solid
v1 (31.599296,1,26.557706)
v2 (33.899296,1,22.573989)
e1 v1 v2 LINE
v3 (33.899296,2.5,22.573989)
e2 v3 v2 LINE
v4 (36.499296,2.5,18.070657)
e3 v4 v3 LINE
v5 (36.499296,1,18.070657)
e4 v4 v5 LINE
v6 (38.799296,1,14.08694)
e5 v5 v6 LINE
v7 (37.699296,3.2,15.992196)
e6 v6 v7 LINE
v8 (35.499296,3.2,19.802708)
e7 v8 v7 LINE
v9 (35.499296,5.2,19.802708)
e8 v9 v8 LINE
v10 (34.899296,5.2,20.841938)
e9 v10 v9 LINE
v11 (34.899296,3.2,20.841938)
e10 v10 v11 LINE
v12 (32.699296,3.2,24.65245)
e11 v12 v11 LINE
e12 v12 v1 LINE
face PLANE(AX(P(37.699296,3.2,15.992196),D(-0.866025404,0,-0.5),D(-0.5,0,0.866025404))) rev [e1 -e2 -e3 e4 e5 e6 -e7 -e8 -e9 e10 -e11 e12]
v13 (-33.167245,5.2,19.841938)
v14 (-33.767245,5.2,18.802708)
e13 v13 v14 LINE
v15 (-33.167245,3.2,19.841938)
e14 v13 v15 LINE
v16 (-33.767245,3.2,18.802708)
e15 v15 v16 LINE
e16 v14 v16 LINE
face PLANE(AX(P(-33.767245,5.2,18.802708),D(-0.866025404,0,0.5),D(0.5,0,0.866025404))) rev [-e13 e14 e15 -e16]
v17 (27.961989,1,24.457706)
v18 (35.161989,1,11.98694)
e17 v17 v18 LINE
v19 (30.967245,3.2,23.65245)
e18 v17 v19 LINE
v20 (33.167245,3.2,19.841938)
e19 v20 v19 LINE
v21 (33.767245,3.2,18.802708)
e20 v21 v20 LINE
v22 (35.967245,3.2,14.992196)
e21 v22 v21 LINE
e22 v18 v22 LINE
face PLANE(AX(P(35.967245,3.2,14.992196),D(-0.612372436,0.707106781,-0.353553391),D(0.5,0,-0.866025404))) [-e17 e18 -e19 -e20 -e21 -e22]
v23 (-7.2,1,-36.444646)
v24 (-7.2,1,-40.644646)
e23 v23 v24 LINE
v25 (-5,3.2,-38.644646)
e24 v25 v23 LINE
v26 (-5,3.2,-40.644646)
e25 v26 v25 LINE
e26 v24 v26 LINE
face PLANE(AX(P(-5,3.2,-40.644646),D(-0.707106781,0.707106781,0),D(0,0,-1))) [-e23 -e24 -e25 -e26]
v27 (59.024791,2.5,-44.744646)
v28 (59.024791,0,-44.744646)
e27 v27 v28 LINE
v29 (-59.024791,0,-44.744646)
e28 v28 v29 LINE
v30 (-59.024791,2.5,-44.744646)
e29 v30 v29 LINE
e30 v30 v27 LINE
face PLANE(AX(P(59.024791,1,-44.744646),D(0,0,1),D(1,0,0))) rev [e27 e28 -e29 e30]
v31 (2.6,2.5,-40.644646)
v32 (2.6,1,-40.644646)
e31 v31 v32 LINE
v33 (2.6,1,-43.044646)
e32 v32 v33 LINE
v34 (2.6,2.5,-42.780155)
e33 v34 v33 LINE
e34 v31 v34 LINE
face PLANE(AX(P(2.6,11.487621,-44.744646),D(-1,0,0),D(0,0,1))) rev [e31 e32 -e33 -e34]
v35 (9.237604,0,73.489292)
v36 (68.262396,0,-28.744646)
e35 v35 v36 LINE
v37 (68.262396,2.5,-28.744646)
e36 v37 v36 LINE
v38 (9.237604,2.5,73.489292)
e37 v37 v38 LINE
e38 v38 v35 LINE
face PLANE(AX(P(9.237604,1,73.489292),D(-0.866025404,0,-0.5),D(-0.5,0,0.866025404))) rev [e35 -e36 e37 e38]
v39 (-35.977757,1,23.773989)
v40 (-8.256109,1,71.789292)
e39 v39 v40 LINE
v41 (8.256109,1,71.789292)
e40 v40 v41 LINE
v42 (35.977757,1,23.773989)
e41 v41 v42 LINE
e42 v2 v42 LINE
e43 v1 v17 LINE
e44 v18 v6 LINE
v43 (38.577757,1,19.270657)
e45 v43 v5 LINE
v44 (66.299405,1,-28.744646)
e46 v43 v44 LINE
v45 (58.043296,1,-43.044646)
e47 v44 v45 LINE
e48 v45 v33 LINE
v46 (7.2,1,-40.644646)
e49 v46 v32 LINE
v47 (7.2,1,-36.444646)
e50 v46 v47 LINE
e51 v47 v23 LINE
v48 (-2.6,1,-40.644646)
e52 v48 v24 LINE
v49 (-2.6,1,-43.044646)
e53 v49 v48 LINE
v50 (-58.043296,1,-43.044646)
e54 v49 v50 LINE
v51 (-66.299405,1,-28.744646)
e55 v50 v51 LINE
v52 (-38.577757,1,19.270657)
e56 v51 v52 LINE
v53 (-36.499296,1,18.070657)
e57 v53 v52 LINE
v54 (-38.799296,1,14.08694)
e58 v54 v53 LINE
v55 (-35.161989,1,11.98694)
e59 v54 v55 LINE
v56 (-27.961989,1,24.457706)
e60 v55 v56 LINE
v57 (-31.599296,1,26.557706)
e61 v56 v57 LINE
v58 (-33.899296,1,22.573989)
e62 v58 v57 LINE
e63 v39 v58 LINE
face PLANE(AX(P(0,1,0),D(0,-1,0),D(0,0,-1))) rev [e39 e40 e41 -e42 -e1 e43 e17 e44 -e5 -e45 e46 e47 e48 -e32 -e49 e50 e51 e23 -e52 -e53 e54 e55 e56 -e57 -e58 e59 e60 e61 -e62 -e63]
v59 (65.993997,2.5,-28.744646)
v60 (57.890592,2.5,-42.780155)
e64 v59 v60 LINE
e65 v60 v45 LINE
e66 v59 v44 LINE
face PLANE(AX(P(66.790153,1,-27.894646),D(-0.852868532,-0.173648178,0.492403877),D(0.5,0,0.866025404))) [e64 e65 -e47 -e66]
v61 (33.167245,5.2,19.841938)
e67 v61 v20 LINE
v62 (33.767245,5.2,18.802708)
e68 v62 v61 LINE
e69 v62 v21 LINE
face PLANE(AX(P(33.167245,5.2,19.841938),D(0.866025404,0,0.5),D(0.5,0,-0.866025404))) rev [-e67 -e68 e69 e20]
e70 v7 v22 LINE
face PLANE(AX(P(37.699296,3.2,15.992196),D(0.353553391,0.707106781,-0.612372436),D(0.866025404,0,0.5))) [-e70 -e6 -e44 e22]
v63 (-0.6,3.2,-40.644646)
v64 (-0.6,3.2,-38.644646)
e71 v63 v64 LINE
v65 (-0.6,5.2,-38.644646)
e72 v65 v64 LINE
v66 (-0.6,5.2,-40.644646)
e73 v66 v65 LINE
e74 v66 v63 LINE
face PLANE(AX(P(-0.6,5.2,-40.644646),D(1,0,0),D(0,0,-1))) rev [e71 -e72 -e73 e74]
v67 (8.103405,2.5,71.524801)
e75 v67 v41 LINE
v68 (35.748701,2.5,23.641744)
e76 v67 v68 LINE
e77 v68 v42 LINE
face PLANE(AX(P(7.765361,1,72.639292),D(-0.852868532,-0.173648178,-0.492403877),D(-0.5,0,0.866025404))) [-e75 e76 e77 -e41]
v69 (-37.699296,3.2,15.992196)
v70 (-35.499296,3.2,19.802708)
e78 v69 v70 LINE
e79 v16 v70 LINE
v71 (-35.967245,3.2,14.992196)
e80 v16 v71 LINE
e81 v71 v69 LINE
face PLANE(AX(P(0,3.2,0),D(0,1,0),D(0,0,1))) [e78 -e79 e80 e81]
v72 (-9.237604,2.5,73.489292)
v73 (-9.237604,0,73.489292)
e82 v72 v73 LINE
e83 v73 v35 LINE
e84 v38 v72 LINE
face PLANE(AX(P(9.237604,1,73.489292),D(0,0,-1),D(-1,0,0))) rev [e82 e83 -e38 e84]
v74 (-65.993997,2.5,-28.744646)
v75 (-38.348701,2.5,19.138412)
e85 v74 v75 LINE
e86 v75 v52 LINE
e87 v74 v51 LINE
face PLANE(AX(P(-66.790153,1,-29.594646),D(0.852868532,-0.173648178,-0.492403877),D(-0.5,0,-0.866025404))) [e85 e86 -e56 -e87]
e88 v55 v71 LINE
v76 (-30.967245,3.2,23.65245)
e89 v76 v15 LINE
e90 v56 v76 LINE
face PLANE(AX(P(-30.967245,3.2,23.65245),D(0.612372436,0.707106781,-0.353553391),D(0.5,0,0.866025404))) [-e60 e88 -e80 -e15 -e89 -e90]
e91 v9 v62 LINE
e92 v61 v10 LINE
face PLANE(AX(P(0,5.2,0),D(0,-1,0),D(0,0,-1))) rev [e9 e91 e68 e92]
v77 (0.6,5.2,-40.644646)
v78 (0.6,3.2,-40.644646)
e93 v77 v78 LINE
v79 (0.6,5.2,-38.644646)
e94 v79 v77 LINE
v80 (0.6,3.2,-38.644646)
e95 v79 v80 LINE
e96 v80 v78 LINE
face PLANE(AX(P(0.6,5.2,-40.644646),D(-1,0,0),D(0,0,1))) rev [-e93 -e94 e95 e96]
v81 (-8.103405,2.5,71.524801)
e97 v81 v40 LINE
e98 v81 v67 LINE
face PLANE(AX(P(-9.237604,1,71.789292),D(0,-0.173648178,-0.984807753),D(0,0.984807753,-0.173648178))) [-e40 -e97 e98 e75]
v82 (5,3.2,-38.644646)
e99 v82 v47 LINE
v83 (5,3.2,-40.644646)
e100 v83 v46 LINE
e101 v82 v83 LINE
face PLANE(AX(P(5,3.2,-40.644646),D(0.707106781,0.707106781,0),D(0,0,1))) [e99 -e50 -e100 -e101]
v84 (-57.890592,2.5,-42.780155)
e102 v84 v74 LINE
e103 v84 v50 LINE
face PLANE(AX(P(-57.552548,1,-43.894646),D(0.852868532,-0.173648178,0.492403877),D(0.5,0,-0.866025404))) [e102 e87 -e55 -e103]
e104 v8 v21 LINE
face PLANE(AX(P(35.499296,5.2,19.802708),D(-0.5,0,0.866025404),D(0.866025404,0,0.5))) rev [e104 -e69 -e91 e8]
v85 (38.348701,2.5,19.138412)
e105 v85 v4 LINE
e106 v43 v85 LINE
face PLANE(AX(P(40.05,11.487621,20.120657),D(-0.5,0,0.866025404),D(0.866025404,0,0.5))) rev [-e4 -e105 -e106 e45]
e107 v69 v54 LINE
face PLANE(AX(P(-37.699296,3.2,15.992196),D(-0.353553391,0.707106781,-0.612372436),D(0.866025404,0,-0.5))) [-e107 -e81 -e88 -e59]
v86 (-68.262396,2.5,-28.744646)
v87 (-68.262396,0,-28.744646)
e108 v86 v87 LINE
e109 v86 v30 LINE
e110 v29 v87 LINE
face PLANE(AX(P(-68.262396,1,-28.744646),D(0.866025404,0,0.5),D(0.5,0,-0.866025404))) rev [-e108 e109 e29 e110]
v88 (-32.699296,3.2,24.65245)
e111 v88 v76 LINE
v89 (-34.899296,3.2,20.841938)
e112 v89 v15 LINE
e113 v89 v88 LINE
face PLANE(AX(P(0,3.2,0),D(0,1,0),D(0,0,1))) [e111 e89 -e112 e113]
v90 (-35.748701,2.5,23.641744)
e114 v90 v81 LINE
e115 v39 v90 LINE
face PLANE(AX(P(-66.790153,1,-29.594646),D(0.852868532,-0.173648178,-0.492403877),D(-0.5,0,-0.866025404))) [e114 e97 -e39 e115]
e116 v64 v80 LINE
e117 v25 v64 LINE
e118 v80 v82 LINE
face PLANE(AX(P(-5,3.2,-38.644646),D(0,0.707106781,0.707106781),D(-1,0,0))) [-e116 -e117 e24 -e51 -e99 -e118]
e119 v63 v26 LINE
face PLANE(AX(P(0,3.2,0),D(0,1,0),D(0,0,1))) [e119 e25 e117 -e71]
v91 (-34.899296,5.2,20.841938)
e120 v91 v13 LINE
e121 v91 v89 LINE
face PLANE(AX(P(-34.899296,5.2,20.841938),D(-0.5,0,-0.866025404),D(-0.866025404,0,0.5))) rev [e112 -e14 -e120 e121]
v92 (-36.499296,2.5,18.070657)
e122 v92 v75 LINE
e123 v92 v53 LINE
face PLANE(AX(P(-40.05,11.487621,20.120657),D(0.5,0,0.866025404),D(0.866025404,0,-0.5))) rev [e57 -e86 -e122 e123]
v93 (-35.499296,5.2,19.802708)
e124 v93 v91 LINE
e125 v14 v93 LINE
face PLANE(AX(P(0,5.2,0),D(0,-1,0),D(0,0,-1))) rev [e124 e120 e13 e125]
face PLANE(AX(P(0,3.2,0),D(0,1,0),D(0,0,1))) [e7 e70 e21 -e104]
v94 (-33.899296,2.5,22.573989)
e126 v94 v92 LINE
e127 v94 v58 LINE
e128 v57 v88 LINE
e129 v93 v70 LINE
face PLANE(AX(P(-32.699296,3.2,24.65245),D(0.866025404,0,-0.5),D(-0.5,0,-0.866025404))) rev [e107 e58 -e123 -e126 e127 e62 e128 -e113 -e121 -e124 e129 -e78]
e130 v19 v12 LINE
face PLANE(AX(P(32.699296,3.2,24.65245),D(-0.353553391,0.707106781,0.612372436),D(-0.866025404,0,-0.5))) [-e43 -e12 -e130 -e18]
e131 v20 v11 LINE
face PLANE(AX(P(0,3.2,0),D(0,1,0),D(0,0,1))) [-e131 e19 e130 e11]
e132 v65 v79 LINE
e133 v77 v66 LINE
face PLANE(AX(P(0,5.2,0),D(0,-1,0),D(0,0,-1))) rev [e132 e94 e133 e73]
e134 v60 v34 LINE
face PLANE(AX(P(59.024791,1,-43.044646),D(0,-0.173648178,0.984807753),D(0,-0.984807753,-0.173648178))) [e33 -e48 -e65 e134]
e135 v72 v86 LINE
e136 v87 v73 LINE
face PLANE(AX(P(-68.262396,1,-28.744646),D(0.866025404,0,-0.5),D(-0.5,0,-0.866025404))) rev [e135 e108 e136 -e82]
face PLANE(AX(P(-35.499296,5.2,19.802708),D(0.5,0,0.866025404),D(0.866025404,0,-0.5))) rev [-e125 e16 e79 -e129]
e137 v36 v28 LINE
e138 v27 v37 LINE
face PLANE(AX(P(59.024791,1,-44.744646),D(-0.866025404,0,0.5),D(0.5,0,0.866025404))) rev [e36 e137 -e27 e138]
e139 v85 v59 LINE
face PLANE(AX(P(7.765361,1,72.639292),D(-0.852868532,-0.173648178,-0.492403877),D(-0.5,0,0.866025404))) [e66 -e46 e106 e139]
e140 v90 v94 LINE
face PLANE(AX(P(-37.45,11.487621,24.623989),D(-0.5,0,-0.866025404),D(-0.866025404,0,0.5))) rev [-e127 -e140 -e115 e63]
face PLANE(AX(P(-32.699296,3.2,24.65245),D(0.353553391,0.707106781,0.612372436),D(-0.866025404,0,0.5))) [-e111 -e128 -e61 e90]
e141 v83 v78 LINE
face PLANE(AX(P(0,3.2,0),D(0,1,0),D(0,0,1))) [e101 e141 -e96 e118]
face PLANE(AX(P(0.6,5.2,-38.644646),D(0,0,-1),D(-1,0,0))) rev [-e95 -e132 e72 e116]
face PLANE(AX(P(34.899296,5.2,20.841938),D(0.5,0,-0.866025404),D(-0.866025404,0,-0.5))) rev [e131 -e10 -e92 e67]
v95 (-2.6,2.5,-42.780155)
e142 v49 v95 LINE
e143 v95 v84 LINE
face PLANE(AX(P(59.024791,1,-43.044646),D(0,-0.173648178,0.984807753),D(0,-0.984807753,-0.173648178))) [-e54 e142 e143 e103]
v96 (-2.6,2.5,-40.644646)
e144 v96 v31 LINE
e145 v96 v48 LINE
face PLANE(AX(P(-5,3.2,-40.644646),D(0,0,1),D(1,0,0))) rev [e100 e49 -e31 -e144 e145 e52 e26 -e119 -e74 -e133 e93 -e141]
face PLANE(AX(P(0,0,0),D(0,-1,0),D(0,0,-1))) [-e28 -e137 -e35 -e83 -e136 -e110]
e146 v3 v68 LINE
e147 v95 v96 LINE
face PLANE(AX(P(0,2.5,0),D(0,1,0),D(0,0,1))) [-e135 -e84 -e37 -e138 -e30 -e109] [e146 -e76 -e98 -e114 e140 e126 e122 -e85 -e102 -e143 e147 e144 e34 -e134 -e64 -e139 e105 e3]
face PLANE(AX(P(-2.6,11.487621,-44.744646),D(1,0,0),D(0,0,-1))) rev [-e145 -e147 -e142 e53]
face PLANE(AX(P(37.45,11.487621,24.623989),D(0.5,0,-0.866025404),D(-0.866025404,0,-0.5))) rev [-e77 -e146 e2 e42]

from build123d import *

# Parameters (mm, degrees)
BOSS_EXTRU_2_DEPTH              = 1
EXTRU_MINCE1_DEPTH              = 1.5
EXTRU_MINCE1_DRAFT              = -10
ENL_V_DE_MAT_EXTRU_MINCE1_DEPTH = 101.734373448
ESQUISSE7_W                     = 5.2
ESQUISSE7_H                     = 4.1
BOSS_EXTRU_5_DEPTH              = 1.5
ESQUISSE8_W                     = 10
ESQUISSE8_H                     = 2
BOSS_EXTRU_6_DEPTH              = 2.2
CHANFREIN1_SIZE                 = 2.2
ESQUISSE9_W                     = 1.2
ESQUISSE9_H                     = 2
BOSS_EXTRU_7_DEPTH              = 2


with BuildPart() as part:
    # Esquisse2 → Boss.-Extru.2 (new body)
    with BuildSketch(Plane(origin=(0, 0, 0), x_dir=(1, 0, 0), z_dir=(0, 1, 0))):
        Polygon((-68.262395693, 28.744645862), (-59.024791386, 44.744645862), (59.024791386, 44.744645862), (68.262395693, 28.744645862), (9.237604307, -73.489291724), (-9.237604307, -73.489291724), align=None)
    extrude(amount=BOSS_EXTRU_2_DEPTH)


with BuildPart() as extru_mince1_tool:
    # Esquisse5 → Extru.-Mince1 (with draft: the straight prism first)
    with BuildSketch(Plane(origin=(0, 1, 0), x_dir=(1, 0, 0), z_dir=(0, 1, 0))):
        Polygon((-68.262395693, 28.744645862), (-9.237604307, -73.489291724), (9.237604307, -73.489291724), (68.262395693, 28.744645862), (59.024791386, 44.744645862), (-59.024791386, 44.744645862), align=None)
        Polygon((-66.299404778, 28.744645862), (-8.256108849, -71.789291724), (8.256108849, -71.789291724), (66.299404778, 28.744645862), (58.043295928, 43.044645862), (-58.043295928, 43.044645862), align=None, mode=Mode.SUBTRACT)
    extrude(amount=EXTRU_MINCE1_DEPTH)
    # Extru.-Mince1: the draft: its side faces are tilted about the plane it starts from
    extru_mince1_sides = [extru_mince1_tool.faces().sort_by_distance(p)[0] for p in [
        (-38.75, 1.75, 22.372322931),
        (0, 1.75, 73.489291724),
        (38.75, 1.75, 22.372322931),
        (63.643593539, 1.75, -36.744645862),
        (0, 1.75, -44.744645862),
        (-63.643593539, 1.75, -36.744645862),
        (-62.171350353, 1.75, -35.894645862),
        (0, 1.75, -43.044645862),
        (62.171350353, 1.75, -35.894645862),
        (37.277756814, 1.75, 21.522322931),
        (0, 1.75, 71.789291724),
        (-37.277756814, 1.75, 21.522322931),
    ]]
    draft(extru_mince1_sides, Plane(origin=(0, 1, 0), x_dir=(1, 0, 0), z_dir=(0, 1, 0)), EXTRU_MINCE1_DRAFT)


with BuildPart() as part_1:
    add(part.part)

    # Extru.-Mince1: add extru_mince1_tool
    add(extru_mince1_tool.part)

    # Esquisse6 → Enlèv. de mat.-Extru.-Mince1 (cut, through all)
    with BuildSketch(Plane.XZ):
        Polygon((-59.89081679, -46.244645862), (59.89081679, -46.244645862), (69.994446501, -28.744645862), (10.103629711, 74.989291724), (-10.103629711, 74.989291724), (-69.994446501, -28.744645862), align=None)
        Polygon((-59.024791386, -44.744645862), (59.024791386, -44.744645862), (68.262395693, -28.744645862), (9.237604307, 73.489291724), (-9.237604307, 73.489291724), (-68.262395693, -28.744645862), align=None, mode=Mode.SUBTRACT)
    extrude(amount=-ENL_V_DE_MAT_EXTRU_MINCE1_DEPTH, mode=Mode.SUBTRACT)

    # Esquisse7 → Boss.-Extru.5 (add)
    with BuildSketch(Plane(origin=(0, 1, 0), x_dir=(1, 0, 0), z_dir=(0, 1, 0))):
        with Locations((0, 42.694645862)):
            Rectangle(ESQUISSE7_W, ESQUISSE7_H)
        Polygon((33.899295844, -22.573988981), (36.499295844, -18.070656881), (40.05, -20.120656881), (37.45, -24.623988981), align=None)
        Polygon((-36.499295844, -18.070656881), (-33.899295844, -22.573988981), (-37.45, -24.623988981), (-40.05, -20.120656881), align=None)
    extrude(amount=BOSS_EXTRU_5_DEPTH)

    # Esquisse8 → Boss.-Extru.6 (add)
    with BuildSketch(Plane(origin=(0, 1, 0), x_dir=(1, 0, 0), z_dir=(0, 1, 0))):
        with Locations((0, 39.644645862)):
            Rectangle(ESQUISSE8_W, ESQUISSE8_H)
        Polygon((37.699295844, -15.992195912), (32.699295844, -24.65244995), (30.967245037, -23.65244995), (35.967245037, -14.992195912), align=None)
        Polygon((-32.699295844, -24.65244995), (-37.699295844, -15.992195912), (-35.967245037, -14.992195912), (-30.967245037, -23.65244995), align=None)
    extrude(amount=BOSS_EXTRU_6_DEPTH)

    # Chanfrein1
    chanfrein1_edges = [part_1.edges().sort_by_distance(p)[0] for p in [
        (-31.833270441, 1, 24.15244995),
        (-36.833270441, 1, 15.492195912),
        (-33.467245037, 1, 19.322322931),
        (36.833270441, 1, 15.492195912),
        (33.467245037, 1, 19.322322931),
        (31.833270441, 1, 24.15244995),
        (5, 1, -39.644645862),
        (-5, 1, -39.644645862),
        (0, 1, -38.644645862),
    ]]
    chamfer(chanfrein1_edges, length=CHANFREIN1_SIZE - 0.0001)  # a hair under: the kernel refuses the full size

    # Esquisse9 → Boss.-Extru.7 (add)
    with BuildSketch(Plane(origin=(0, 3.2, 0), x_dir=(1, 0, 0), z_dir=(0, 1, 0))):
        with Locations((0, 39.644645862)):
            Rectangle(ESQUISSE9_W, ESQUISSE9_H)
        Polygon((34.899295844, -20.841938173), (35.499295844, -19.802707689), (33.767245037, -18.802707689), (33.167245037, -19.841938173), align=None)
        Polygon((-35.499295844, -19.802707689), (-34.899295844, -20.841938173), (-33.167245037, -19.841938173), (-33.767245037, -18.802707689), align=None)
    extrude(amount=BOSS_EXTRU_7_DEPTH)


solid = part_1.part
